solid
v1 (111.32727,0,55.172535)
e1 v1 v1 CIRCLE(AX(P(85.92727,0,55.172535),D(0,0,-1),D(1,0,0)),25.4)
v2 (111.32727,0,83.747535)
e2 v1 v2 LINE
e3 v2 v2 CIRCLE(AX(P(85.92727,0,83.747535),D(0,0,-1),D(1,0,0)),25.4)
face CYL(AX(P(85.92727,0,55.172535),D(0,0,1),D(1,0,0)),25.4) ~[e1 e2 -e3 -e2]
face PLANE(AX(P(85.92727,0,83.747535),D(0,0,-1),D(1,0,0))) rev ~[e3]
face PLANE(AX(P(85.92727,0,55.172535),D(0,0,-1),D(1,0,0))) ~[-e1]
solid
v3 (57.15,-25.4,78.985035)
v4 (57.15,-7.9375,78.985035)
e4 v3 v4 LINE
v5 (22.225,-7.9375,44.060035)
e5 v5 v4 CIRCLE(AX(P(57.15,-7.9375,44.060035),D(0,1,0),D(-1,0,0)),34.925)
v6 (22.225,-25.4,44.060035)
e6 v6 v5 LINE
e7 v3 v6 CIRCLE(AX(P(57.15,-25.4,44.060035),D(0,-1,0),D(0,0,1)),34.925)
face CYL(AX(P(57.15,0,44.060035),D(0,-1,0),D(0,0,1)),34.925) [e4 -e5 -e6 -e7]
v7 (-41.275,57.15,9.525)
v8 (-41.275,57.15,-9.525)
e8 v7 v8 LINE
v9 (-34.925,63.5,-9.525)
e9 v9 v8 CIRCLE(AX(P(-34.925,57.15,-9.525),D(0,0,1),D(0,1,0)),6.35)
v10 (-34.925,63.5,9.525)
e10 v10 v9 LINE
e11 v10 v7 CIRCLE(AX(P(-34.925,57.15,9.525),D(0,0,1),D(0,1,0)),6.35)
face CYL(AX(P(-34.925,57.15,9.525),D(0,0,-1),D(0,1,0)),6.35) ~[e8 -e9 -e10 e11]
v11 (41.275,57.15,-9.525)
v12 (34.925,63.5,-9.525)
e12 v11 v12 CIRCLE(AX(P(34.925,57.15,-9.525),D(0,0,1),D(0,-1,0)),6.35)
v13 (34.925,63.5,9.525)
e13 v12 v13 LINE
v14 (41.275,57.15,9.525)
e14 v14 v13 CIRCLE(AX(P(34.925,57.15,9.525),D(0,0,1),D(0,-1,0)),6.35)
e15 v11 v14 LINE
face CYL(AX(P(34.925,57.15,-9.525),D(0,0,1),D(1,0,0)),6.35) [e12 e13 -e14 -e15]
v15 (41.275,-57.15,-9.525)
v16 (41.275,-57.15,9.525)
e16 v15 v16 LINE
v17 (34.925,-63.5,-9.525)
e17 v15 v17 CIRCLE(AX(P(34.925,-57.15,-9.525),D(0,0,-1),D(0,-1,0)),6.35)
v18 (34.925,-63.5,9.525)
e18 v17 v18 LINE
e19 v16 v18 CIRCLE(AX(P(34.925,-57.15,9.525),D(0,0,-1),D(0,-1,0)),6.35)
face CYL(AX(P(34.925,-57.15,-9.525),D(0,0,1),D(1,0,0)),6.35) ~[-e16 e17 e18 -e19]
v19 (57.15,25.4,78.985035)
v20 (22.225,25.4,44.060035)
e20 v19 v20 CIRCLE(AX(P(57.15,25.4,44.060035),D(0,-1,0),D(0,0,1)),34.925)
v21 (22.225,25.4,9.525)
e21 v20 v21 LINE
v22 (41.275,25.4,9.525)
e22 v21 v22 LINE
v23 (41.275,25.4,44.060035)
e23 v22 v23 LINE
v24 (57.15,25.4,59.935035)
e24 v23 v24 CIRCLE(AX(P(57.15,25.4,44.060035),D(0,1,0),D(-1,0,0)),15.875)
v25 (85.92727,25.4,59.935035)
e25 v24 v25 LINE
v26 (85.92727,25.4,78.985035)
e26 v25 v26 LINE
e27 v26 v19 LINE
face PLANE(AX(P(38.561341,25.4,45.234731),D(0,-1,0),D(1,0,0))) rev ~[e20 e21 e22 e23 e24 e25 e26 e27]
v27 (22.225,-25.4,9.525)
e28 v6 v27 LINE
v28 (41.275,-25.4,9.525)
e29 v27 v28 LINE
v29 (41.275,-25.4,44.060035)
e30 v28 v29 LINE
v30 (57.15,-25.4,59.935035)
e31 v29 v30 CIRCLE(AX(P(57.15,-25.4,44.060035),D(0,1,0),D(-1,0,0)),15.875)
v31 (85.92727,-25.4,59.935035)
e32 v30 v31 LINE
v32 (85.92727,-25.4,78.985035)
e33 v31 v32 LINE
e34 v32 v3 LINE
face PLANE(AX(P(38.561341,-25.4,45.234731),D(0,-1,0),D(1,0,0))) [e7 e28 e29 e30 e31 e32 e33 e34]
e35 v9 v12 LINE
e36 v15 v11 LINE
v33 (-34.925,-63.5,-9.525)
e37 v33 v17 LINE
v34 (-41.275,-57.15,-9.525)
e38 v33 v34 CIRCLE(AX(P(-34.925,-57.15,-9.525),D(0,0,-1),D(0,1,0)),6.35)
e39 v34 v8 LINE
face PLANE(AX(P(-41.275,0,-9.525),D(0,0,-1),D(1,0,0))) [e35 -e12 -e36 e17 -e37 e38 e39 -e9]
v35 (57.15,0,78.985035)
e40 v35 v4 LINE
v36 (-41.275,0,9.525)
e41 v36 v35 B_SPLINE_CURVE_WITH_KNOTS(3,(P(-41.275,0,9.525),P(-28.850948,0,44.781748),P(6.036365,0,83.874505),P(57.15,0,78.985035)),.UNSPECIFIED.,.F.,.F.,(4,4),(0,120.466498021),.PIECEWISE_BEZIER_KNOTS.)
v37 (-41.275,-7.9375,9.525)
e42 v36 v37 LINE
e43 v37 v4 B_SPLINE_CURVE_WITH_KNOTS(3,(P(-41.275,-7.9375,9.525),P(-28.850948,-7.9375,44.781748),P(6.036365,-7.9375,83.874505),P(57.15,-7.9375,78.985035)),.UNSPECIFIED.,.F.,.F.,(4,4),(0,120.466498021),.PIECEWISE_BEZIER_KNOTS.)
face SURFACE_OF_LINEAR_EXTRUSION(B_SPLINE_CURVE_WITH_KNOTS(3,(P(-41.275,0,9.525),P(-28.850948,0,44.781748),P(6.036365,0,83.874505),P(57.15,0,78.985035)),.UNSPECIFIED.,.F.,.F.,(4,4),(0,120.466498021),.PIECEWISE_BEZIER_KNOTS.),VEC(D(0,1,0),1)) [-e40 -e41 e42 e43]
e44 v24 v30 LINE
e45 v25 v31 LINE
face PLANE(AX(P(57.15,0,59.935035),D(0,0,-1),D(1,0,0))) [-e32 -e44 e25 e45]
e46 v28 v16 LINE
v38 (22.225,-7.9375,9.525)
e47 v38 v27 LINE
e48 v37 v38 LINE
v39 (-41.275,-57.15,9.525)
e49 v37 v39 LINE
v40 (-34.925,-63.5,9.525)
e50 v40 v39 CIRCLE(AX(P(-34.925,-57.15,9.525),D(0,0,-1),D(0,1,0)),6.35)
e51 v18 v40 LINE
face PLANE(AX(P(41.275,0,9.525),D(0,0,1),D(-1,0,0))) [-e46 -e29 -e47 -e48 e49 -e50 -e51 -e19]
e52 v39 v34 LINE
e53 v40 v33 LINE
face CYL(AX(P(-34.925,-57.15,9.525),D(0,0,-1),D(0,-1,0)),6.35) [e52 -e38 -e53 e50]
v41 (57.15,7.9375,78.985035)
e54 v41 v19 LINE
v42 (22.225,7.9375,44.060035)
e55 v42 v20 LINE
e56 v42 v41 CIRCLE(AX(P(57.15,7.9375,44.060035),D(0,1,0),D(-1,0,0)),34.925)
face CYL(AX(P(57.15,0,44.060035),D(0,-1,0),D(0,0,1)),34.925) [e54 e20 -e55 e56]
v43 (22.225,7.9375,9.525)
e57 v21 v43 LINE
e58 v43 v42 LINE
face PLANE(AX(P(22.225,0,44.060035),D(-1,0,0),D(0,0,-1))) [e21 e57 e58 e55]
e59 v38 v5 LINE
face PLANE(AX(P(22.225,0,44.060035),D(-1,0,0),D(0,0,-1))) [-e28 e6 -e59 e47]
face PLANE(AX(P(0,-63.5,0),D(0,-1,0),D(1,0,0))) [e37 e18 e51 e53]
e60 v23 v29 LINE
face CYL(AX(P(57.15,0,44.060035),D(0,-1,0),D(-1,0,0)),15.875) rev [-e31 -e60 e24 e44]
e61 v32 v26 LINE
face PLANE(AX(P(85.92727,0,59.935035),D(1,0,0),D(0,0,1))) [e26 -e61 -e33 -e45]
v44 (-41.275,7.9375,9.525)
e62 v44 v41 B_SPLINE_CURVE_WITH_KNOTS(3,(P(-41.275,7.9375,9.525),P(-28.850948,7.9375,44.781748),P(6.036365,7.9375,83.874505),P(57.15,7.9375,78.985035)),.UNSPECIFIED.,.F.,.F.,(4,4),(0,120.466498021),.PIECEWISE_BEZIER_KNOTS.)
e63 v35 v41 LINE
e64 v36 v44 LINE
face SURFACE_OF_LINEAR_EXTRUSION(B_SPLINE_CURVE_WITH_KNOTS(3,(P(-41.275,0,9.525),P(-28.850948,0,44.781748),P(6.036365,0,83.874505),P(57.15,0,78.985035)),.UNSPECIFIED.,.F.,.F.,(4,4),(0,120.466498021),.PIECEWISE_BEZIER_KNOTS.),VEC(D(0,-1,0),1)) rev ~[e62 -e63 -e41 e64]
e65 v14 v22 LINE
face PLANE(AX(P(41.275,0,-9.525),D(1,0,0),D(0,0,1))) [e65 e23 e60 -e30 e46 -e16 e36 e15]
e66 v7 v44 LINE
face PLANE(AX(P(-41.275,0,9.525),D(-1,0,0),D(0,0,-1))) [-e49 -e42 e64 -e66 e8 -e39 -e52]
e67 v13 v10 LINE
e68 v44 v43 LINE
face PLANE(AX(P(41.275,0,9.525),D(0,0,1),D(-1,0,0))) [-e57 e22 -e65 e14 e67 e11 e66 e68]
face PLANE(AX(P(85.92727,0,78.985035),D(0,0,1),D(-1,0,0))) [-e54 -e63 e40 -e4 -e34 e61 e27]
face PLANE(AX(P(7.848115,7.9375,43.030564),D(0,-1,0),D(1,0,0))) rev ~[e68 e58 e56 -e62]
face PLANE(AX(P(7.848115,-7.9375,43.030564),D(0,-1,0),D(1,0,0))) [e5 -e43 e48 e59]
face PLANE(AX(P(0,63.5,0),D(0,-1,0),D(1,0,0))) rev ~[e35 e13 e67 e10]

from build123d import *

# Parameters (mm, degrees)
F1_DEPTH = 63.5
F0_W     = 25.4
F0_H     = 19.05
F2_DEPTH = 25.4
F3_DEPTH = 7.9375
F5_R     = 6.35


with BuildPart() as f1:
    # F0 (on Front) → F1 (new body, symmetric)
    with BuildSketch(Plane.XZ):
        Polygon((41.275, -9.525), (41.275, 9.525), (22.225, 9.525), (-41.275, 9.525), (-41.275, -9.525), align=None)
    extrude(amount=F1_DEPTH, both=True)

    # F0 (on Front) → F2 (join, symmetric)
    with BuildSketch(Plane.XZ):
        with BuildLine():
            Line((22.225, 9.525), (41.275, 9.525))
            Line((41.275, 9.525), (41.275, 44.0600354195))
            ThreePointArc((41.275, 44.0600354195), (45.9246798487, 55.2853555708), (57.15, 59.9350354195))
            Line((57.15, 59.9350354195), (60.5272703528, 59.9350354195))
            Line((60.5272703528, 59.9350354195), (60.5272703528, 78.9850354195))
            Line((60.5272703528, 78.9850354195), (57.15, 78.9850354195))
            ThreePointArc((57.15, 78.9850354195), (32.4542956671, 68.7557397524), (22.225, 44.0600354195))
            Line((22.225, 44.0600354195), (22.225, 9.525))
        make_face()
        with Locations((73.2272703528, 69.4600354195)):
            Rectangle(F0_W, F0_H)
    extrude(amount=F2_DEPTH, both=True)

    # F0 (on Front) → F3 (join, symmetric)
    with BuildSketch(Plane.XZ):
        with BuildLine():
            Line((-41.275, 9.525), (22.225, 9.525))
            Line((22.225, 9.525), (22.225, 44.0600354195))
            ThreePointArc((22.225, 44.0600354195), (32.4542956671, 68.7557397524), (57.15, 78.9850354195))
            add(Edge.make_bspline(
                [(-41.275, 9.525), (-28.850948438, 44.7817482054), (6.0363649391, 83.8745053786), (57.15, 78.9850354195)],
                knots=[0, 0, 0, 0, 120.4664980211, 120.4664980211, 120.4664980211, 120.4664980211], degree=3))
        make_face()
    extrude(amount=F3_DEPTH, both=True)

    # F5
    f5_edges = [f1.edges().sort_by_distance(p)[0] for p in [
        (41.275, -63.5, 0),
        (-41.275, -63.5, 0),
        (-41.275, 63.5, 0),
        (41.275, 63.5, 0),
    ]]
    fillet(f5_edges, radius=F5_R)


with BuildPart() as f4:
    # F0 (on Front) → F4 (revolve)
    with BuildSketch(Plane.XZ):
        Polygon((85.9272703528, 78.9850354195), (85.9272703528, 59.9350354195), (85.9272703528, 55.1725354195), (111.3272703528, 55.1725354195), (111.3272703528, 83.7475354195), (85.9272703528, 83.7475354195), align=None)
    revolve(axis=Axis((85.9272703528, 0, 69.4600354195), (0, 0, -1)))


solid = Compound([f1.part, f4.part])
